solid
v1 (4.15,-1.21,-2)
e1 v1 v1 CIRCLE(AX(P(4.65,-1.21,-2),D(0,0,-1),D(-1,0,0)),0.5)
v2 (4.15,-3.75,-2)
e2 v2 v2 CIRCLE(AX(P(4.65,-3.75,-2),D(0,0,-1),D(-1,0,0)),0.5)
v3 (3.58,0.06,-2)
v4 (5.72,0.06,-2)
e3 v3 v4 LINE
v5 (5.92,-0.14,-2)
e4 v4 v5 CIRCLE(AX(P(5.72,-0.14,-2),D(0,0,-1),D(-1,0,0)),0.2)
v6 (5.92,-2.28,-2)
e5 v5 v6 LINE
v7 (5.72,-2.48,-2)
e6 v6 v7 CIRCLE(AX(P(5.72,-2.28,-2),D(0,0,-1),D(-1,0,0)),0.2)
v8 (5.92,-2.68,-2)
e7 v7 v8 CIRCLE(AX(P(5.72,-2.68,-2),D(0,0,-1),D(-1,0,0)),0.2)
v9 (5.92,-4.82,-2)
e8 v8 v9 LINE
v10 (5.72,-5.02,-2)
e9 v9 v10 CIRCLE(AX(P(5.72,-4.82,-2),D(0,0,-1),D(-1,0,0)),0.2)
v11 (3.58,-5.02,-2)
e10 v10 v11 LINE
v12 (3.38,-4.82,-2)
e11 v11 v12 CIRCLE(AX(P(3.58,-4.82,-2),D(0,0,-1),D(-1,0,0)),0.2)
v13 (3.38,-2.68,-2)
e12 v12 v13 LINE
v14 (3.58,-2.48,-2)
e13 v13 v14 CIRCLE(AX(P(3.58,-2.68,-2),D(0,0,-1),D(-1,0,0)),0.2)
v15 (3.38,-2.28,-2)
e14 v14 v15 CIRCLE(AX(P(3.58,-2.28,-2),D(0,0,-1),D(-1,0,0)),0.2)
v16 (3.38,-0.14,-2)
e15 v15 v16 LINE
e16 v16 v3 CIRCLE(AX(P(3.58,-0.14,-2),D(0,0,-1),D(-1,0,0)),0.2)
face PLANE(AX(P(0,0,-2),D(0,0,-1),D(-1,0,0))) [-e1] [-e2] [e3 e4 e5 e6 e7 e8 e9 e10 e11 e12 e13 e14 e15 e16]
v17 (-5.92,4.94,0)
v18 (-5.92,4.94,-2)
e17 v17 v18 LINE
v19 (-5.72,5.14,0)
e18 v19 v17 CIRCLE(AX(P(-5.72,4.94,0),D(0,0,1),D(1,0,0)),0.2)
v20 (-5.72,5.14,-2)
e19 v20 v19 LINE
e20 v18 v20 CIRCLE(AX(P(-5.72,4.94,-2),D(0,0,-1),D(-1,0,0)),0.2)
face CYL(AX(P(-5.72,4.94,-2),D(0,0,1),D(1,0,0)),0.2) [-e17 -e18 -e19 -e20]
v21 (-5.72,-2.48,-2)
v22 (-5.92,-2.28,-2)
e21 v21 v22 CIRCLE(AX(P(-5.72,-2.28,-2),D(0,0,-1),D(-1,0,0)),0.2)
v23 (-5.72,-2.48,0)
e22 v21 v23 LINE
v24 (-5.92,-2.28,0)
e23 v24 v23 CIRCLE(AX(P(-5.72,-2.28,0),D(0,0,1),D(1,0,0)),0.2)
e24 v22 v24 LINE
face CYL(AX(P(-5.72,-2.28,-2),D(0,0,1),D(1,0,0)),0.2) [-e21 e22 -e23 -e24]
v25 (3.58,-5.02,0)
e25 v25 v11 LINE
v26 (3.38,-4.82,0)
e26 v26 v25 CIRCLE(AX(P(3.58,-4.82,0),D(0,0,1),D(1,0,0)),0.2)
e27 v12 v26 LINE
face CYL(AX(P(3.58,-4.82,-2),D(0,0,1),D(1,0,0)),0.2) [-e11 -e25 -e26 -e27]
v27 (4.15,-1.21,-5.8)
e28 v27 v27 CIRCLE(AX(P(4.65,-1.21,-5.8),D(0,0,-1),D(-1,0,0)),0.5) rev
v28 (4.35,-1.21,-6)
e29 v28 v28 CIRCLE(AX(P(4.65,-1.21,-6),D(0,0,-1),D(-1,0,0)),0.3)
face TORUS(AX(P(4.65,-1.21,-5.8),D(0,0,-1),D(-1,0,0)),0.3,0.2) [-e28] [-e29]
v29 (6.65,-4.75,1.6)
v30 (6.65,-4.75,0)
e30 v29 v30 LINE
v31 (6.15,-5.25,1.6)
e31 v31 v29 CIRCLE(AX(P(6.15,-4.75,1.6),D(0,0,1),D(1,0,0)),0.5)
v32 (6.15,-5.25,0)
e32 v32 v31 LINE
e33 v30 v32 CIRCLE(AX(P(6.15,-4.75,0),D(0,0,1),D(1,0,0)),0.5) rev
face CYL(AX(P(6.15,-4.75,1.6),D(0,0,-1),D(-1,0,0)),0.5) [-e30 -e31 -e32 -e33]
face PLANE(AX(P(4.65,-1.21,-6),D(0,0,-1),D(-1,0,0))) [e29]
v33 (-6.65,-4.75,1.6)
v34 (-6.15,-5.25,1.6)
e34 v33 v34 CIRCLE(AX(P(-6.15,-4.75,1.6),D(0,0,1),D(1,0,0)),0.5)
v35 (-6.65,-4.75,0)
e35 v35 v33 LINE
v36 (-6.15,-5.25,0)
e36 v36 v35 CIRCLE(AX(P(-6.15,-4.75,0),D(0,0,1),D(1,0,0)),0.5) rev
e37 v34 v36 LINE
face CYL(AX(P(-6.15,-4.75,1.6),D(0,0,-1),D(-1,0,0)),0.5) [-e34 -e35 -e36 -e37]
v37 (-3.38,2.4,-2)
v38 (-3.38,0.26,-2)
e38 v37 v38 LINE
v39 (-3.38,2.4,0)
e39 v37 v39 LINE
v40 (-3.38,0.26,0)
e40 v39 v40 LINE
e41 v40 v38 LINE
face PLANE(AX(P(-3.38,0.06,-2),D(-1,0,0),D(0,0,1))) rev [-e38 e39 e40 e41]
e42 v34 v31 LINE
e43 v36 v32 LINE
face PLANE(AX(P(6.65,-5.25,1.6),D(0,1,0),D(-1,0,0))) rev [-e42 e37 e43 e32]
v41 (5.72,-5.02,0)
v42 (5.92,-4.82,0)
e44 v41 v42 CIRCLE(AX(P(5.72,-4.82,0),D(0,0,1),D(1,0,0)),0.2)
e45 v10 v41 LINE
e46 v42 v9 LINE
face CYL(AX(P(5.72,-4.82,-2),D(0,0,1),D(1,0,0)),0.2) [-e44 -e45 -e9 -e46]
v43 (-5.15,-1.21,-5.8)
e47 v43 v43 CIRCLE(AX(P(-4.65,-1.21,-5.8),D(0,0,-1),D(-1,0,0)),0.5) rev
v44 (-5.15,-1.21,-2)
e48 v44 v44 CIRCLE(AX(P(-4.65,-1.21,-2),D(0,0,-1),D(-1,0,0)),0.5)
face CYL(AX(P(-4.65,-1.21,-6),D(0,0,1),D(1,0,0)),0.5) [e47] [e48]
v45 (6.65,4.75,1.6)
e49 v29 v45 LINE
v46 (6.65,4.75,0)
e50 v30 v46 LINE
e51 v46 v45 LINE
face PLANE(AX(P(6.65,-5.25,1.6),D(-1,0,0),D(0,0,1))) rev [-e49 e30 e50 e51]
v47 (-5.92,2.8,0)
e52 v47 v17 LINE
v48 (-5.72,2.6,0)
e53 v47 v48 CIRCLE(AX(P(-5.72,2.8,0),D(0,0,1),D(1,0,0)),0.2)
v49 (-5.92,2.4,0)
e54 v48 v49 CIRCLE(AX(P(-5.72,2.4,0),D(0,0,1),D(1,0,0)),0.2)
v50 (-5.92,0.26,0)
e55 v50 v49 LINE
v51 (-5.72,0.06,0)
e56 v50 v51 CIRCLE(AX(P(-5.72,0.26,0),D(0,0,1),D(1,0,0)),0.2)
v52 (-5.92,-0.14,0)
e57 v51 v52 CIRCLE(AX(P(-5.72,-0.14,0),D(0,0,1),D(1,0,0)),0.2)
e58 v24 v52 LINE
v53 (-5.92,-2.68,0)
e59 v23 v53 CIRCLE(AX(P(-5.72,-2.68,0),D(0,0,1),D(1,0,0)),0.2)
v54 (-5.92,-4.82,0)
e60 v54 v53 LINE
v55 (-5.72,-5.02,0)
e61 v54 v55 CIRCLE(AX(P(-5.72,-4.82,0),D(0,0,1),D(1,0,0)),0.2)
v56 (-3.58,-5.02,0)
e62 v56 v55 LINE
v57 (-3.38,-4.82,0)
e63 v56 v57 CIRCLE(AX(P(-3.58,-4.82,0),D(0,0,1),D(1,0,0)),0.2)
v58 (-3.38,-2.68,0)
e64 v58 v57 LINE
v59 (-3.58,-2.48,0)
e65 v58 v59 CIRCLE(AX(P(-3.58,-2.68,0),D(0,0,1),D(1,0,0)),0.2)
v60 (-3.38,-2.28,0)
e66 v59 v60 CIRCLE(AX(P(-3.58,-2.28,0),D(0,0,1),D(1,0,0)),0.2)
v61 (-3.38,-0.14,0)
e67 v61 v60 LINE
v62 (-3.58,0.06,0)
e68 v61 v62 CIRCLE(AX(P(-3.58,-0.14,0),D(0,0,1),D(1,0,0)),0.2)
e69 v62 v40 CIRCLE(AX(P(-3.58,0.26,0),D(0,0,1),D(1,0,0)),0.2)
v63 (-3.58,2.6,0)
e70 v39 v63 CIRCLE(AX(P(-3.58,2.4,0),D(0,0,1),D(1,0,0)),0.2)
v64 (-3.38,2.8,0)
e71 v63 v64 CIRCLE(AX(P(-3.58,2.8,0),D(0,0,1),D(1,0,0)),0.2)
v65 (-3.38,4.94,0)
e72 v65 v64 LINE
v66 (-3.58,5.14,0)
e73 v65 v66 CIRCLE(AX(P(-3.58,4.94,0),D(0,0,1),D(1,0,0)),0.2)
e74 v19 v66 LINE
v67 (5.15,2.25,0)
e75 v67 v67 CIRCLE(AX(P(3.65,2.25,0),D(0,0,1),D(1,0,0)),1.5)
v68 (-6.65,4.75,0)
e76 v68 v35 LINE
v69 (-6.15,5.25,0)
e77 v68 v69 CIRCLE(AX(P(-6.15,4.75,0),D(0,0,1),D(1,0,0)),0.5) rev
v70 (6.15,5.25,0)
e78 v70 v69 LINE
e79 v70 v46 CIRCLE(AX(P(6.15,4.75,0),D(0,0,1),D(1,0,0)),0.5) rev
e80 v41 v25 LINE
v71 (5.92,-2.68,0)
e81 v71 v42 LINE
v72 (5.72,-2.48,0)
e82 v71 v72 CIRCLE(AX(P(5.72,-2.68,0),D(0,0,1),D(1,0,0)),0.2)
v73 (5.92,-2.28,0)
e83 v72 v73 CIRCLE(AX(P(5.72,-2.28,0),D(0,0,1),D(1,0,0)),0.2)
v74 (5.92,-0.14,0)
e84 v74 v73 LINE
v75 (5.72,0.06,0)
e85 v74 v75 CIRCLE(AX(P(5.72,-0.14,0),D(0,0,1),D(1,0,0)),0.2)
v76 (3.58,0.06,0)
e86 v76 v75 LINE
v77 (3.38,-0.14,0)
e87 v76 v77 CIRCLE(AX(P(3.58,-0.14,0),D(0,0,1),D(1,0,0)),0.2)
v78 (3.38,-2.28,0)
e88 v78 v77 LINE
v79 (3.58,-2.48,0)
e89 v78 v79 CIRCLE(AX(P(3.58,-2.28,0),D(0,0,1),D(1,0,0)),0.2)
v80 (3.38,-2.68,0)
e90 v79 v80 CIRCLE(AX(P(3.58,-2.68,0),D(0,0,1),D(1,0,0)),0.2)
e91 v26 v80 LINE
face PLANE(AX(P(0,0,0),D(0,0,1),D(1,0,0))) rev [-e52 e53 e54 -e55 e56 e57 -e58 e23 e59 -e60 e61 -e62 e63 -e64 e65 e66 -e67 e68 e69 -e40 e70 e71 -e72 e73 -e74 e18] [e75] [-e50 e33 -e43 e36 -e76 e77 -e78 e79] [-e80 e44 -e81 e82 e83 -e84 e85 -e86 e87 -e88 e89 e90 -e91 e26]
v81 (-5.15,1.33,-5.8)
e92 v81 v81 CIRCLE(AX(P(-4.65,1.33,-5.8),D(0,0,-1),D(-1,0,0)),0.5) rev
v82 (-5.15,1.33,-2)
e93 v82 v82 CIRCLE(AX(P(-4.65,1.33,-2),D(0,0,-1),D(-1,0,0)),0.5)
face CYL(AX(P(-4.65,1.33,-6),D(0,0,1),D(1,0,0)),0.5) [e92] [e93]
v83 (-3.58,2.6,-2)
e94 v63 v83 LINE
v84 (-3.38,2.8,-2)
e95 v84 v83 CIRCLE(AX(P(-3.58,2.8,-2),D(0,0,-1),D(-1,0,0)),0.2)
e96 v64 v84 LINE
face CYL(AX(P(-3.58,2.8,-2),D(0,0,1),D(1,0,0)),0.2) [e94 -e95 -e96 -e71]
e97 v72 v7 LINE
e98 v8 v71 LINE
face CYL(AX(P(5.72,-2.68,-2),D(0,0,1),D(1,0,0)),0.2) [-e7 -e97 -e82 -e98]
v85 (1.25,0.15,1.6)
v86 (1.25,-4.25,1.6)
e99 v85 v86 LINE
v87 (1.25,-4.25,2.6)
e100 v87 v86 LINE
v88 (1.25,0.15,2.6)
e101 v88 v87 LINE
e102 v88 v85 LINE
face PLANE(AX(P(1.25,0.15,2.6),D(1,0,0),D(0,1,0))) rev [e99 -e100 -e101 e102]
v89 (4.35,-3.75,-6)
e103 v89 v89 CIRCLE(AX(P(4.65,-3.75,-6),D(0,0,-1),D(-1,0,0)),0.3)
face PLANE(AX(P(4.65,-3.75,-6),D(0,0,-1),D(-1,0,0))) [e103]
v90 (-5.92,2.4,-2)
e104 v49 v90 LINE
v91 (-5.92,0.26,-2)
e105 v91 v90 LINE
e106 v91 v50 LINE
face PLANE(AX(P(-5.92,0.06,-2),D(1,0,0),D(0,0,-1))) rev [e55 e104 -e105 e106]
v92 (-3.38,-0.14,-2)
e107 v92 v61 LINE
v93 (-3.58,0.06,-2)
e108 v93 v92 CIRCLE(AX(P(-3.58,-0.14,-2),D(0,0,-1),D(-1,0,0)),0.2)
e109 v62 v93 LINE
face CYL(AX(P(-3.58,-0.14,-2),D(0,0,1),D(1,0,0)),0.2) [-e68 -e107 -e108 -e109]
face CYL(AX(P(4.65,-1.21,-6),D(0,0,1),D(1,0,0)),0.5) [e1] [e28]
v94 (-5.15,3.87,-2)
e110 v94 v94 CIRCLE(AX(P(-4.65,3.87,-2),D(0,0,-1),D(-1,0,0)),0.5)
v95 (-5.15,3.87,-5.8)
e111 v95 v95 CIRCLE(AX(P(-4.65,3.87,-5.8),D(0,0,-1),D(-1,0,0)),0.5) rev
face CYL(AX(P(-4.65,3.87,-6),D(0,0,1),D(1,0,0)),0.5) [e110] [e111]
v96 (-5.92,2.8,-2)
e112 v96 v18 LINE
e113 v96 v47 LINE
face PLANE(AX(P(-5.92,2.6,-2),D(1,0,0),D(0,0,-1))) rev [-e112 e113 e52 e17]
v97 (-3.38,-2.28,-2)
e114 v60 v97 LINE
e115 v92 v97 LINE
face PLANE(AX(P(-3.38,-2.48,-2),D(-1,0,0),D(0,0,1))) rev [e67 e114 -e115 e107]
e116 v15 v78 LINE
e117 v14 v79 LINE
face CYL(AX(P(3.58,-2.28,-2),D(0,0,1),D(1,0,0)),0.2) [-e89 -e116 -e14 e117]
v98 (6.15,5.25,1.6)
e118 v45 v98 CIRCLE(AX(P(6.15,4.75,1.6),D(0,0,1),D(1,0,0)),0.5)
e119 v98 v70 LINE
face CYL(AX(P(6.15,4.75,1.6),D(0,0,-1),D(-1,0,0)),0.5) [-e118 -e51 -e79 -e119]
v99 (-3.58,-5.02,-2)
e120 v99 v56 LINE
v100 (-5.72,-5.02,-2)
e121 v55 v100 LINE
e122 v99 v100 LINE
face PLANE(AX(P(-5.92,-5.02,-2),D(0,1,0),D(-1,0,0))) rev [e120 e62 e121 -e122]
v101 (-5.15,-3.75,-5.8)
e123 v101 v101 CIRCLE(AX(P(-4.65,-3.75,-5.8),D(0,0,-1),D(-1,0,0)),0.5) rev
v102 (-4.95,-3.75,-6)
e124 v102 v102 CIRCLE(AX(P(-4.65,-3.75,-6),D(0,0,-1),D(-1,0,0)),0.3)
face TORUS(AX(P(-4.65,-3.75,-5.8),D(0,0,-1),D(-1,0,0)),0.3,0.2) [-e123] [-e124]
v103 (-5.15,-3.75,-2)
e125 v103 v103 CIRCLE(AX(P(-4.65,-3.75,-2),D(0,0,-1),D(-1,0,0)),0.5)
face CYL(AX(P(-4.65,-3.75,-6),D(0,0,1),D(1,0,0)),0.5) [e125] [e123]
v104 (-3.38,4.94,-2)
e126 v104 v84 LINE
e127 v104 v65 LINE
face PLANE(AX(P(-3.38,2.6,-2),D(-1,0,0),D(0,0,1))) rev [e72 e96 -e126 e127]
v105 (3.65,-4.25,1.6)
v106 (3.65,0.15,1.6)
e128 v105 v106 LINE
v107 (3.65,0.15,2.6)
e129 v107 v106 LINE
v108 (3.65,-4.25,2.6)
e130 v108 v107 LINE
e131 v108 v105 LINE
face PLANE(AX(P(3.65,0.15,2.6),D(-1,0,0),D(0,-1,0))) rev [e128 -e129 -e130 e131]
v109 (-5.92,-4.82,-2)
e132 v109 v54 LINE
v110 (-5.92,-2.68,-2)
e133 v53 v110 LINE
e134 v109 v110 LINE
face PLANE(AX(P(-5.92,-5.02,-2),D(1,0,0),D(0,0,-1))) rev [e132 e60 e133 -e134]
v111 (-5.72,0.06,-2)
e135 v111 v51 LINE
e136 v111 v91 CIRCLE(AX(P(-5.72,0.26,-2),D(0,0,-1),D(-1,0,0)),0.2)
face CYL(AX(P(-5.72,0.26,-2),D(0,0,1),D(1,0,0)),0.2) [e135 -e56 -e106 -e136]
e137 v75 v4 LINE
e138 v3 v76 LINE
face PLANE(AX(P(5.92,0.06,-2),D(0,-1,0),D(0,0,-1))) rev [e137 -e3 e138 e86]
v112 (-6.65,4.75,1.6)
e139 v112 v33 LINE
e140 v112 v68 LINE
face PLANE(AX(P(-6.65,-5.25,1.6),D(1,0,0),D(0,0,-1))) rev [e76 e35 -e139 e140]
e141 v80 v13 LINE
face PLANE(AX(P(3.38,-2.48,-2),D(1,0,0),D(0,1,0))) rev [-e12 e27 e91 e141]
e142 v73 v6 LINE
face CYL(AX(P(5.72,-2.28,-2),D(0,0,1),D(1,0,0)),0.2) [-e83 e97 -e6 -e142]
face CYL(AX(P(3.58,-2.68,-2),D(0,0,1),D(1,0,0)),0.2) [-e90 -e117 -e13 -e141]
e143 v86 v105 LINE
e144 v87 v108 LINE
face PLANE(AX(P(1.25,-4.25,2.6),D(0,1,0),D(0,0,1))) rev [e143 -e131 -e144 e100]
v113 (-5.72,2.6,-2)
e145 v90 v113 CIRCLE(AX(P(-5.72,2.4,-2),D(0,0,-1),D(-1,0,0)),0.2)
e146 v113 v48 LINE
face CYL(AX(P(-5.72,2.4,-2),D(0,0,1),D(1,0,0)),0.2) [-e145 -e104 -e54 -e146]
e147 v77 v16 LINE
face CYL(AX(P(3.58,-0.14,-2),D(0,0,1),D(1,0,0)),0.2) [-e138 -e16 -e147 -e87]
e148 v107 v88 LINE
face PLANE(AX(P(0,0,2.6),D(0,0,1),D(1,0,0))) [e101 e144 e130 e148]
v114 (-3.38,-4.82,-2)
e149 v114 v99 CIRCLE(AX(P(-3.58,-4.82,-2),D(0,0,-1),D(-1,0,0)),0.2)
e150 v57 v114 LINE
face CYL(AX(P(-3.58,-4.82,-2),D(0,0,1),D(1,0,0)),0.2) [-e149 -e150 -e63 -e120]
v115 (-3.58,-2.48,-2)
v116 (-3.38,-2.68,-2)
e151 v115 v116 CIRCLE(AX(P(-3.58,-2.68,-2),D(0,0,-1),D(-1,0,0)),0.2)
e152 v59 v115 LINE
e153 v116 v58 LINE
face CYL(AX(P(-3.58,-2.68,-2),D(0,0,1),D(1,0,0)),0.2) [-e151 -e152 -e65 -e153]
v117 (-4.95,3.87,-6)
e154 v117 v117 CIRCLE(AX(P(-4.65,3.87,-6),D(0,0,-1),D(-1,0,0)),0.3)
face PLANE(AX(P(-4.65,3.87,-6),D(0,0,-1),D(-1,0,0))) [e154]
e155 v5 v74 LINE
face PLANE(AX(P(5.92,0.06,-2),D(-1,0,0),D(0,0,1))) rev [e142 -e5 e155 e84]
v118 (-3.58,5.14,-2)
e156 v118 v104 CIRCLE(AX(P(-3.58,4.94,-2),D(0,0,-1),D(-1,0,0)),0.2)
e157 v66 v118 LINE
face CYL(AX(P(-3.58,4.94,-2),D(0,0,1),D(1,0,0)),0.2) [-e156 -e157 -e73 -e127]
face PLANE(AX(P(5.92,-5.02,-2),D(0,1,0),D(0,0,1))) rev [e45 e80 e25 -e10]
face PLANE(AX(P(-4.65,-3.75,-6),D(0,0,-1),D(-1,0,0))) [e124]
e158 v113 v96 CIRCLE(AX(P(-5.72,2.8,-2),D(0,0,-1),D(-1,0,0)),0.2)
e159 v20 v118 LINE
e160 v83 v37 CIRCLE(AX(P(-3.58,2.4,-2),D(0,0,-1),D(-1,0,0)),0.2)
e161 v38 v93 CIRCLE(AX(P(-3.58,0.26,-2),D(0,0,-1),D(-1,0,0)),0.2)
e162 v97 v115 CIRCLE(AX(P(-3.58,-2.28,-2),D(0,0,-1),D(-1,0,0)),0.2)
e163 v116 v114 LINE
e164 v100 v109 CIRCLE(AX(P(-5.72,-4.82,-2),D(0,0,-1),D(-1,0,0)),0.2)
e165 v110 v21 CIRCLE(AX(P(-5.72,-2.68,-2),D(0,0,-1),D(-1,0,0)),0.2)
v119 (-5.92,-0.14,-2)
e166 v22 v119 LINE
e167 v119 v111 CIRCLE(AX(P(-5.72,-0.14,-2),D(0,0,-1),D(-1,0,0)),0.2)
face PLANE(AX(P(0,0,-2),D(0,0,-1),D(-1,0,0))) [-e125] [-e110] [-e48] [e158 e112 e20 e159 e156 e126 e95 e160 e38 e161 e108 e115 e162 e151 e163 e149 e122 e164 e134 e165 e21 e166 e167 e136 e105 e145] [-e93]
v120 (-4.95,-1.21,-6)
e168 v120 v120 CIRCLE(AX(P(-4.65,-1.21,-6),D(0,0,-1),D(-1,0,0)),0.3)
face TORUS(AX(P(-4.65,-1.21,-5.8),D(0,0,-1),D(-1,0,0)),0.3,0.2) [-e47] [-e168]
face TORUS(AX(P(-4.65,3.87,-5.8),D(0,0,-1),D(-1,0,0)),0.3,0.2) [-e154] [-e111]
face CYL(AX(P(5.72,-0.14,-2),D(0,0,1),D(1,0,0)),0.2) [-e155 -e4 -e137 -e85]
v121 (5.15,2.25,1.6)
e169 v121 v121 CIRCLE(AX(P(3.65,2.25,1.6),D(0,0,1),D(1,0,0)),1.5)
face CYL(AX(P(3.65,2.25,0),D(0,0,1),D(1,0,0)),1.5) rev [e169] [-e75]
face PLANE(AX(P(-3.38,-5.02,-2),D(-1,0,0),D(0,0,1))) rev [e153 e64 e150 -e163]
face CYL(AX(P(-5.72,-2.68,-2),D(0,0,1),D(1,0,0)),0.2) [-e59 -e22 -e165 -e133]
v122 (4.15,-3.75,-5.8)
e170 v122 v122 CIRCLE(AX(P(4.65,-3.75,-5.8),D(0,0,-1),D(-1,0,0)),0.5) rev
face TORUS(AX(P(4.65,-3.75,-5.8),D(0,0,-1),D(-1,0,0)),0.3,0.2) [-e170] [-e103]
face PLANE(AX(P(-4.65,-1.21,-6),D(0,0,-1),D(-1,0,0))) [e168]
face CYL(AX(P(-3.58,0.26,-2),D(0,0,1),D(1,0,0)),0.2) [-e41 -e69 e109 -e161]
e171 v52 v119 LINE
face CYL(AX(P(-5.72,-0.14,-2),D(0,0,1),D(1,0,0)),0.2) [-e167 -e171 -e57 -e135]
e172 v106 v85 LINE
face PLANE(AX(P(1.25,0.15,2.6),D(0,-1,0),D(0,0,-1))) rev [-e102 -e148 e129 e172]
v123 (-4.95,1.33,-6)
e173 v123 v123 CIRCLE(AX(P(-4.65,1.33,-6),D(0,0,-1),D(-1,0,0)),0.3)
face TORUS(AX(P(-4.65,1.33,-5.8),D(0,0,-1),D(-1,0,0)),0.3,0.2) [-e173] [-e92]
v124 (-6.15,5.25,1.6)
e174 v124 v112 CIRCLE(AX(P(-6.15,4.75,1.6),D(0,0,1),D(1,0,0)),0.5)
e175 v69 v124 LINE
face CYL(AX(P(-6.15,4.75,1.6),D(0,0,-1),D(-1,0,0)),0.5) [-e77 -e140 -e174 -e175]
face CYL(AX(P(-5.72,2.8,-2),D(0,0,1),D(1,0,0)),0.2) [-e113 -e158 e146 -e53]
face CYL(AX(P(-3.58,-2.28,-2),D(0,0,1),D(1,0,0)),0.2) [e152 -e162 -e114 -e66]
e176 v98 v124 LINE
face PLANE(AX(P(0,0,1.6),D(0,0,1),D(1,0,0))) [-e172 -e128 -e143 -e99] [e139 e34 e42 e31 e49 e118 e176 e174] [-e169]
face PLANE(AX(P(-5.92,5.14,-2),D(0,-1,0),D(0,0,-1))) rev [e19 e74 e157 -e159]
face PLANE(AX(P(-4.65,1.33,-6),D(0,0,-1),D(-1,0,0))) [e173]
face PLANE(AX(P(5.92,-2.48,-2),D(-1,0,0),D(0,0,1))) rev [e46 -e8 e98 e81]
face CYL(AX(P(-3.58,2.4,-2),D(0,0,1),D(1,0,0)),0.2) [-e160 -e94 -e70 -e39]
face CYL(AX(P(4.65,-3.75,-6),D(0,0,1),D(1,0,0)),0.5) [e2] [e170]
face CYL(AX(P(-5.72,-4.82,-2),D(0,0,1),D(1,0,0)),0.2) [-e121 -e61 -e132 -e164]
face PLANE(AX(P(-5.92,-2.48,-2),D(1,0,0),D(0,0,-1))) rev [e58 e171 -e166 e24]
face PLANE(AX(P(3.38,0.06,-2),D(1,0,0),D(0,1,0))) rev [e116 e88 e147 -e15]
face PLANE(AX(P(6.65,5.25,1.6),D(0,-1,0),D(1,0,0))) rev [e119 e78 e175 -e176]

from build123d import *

# Parameters (mm, degrees)
SKETCH1_W           = 13.3
SKETCH1_H           = 10.5
BOSS_EXTRUDE1_DEPTH = 1.6
SKETCH2_R           = 1.5
CUT_EXTRUDE1_DEPTH  = 1.6
SKETCH3_W           = 2.4
SKETCH3_H           = 4.4
BOSS_EXTRUDE2_DEPTH = 1
FILLET1_R           = 0.5
SKETCH4_W           = 2.54
SKETCH4_H           = 2.54
BOSS_EXTRUDE3_DEPTH = 2
SKETCH5_R           = 0.5
BOSS_EXTRUDE4_DEPTH = 4
FILLET2_R           = 0.2
LPATTERN1_START     = -2
LPATTERN1_DEPTH     = 2
SKETCH6_W           = 2.54
SKETCH6_H           = 2.54
BOSS_EXTRUDE5_DEPTH = 2
SKETCH7_R           = 0.5
BOSS_EXTRUDE6_DEPTH = 4
FILLET3_R           = 0.2
LPATTERN2_START     = -2
LPATTERN2_DEPTH     = 2


# Read off the part's stored shape, not the designer's step: LPattern1, LPattern2
with BuildPart() as part:
    # Sketch1 → Boss-Extrude1 (new body)
    with BuildSketch(Plane.XY):
        Rectangle(SKETCH1_W, SKETCH1_H)
    extrude(amount=BOSS_EXTRUDE1_DEPTH)

    # Sketch2 → Cut-Extrude1 (cut)
    with BuildSketch(Plane.XY.offset(1.6)):
        with Locations((3.65, 2.25)):
            Circle(SKETCH2_R)
    extrude(amount=-CUT_EXTRUDE1_DEPTH, mode=Mode.SUBTRACT)

    # Sketch3 → Boss-Extrude2 (add)
    with BuildSketch(Plane.XY.offset(1.6)):
        with Locations((2.45, -2.05)):
            Rectangle(SKETCH3_W, SKETCH3_H)
    extrude(amount=BOSS_EXTRUDE2_DEPTH)

    # Fillet1
    fillet1_edges = [part.edges().sort_by_distance(p)[0] for p in [
        (-6.65, 5.25, 0.8),
        (6.65, 5.25, 0.8),
        (6.65, -5.25, 0.8),
        (-6.65, -5.25, 0.8),
    ]]
    fillet(fillet1_edges, radius=FILLET1_R)

    # Sketch4 → Boss-Extrude3 (add)
    with BuildSketch(Plane(origin=(0, 0, 0), x_dir=(-1, 0, 0), z_dir=(0, 0, -1))):
        with Locations((4.65, -3.75)):
            Rectangle(SKETCH4_W, SKETCH4_H)
    extrude(amount=BOSS_EXTRUDE3_DEPTH)

    # Sketch5 → Boss-Extrude4 (add)
    with BuildSketch(Plane(origin=(0, 0, -2), x_dir=(-1, 0, 0), z_dir=(0, 0, -1))):
        with Locations((4.65, -3.75)):
            Circle(SKETCH5_R)
    extrude(amount=BOSS_EXTRUDE4_DEPTH)

    # Fillet2
    fillet2_edges = [part.edges().sort_by_distance(p)[0] for p in [
        (-3.38, -2.48, -1),
        (-3.38, -5.02, -1),
        (-5.92, -5.02, -1),
        (-5.92, -2.48, -1),
        (-4.15, -3.75, -6),
    ]]
    fillet(fillet2_edges, radius=FILLET2_R)

    # LPattern1 outline → LPattern1 (add)
    with BuildSketch(Plane.XY.offset(LPATTERN1_START)):
        with BuildLine():
            Line((-3.38, -2.28), (-3.38, -0.14))
            ThreePointArc((-3.38, -0.14), (-3.438578644, 0.001421356), (-3.58, 0.06))
            ThreePointArc((-3.58, 0.06), (-3.438578644, 0.118578644), (-3.38, 0.26))
            Line((-3.38, 0.26), (-3.38, 2.4))
            ThreePointArc((-3.38, 2.4), (-3.438578644, 2.541421356), (-3.58, 2.6))
            ThreePointArc((-3.58, 2.6), (-3.438578644, 2.658578644), (-3.38, 2.8))
            Line((-3.38, 2.8), (-3.38, 4.94))
            ThreePointArc((-3.38, 4.94), (-3.438578644, 5.081421356), (-3.58, 5.14))
            Line((-3.58, 5.14), (-5.72, 5.14))
            ThreePointArc((-5.72, 5.14), (-5.861421356, 5.081421356), (-5.92, 4.94))
            Line((-5.92, 4.94), (-5.92, 2.8))
            ThreePointArc((-5.92, 2.8), (-5.861421356, 2.658578644), (-5.72, 2.6))
            ThreePointArc((-5.72, 2.6), (-5.861421356, 2.541421356), (-5.92, 2.4))
            Line((-5.92, 2.4), (-5.92, 0.26))
            ThreePointArc((-5.92, 0.26), (-5.861421356, 0.118578644), (-5.72, 0.06))
            ThreePointArc((-5.72, 0.06), (-5.861421356, 0.001421356), (-5.92, -0.14))
            Line((-5.92, -0.14), (-5.92, -2.28))
            ThreePointArc((-5.92, -2.28), (-5.861421356, -2.421421356), (-5.72, -2.48))
            Line((-5.72, -2.48), (-3.58, -2.48))
            ThreePointArc((-3.58, -2.48), (-3.438578644, -2.421421356), (-3.38, -2.28))
        make_face()
    extrude(amount=LPATTERN1_DEPTH)

    # LPattern1 2 outline → LPattern1 2 (revolve)
    with BuildSketch(Plane(origin=(-4.65, -1.21, 0), x_dir=(1, 0, 0), z_dir=(0, -1, 0))):
        with BuildLine():
            Line((0, -2), (0, -6))
            Line((0, -6), (0.3, -6))
            ThreePointArc((0.3, -6), (0.441421356, -5.941421356), (0.5, -5.8))
            Line((0.5, -5.8), (0.5, -2))
            Line((0.5, -2), (0, -2))
        make_face()
    revolve(axis=Axis((-4.65, -1.21, 0), (0, 0, 1)))

    # LPattern1 3 outline → LPattern1 3 (revolve)
    with BuildSketch(Plane(origin=(-4.65, 1.33, 0), x_dir=(1, 0, 0), z_dir=(0, -1, 0))):
        with BuildLine():
            Line((0, -2), (0, -6))
            Line((0, -6), (0.3, -6))
            ThreePointArc((0.3, -6), (0.441421356, -5.941421356), (0.5, -5.8))
            Line((0.5, -5.8), (0.5, -2))
            Line((0.5, -2), (0, -2))
        make_face()
    revolve(axis=Axis((-4.65, 1.33, 0), (0, 0, 1)))

    # LPattern1 4 outline → LPattern1 4 (revolve)
    with BuildSketch(Plane(origin=(-4.65, 3.87, 0), x_dir=(1, 0, 0), z_dir=(0, -1, 0))):
        with BuildLine():
            Line((0, -2), (0, -6))
            Line((0, -6), (0.3, -6))
            ThreePointArc((0.3, -6), (0.441421356, -5.941421356), (0.5, -5.8))
            Line((0.5, -5.8), (0.5, -2))
            Line((0.5, -2), (0, -2))
        make_face()
    revolve(axis=Axis((-4.65, 3.87, 0), (0, 0, 1)))

    # Sketch6 → Boss-Extrude5 (add)
    with BuildSketch(Plane(origin=(0, 0, 0), x_dir=(-1, 0, 0), z_dir=(0, 0, -1))):
        with Locations((-4.65, -3.75)):
            Rectangle(SKETCH6_W, SKETCH6_H)
    extrude(amount=BOSS_EXTRUDE5_DEPTH)

    # Sketch7 → Boss-Extrude6 (add)
    with BuildSketch(Plane(origin=(0, 0, -2), x_dir=(-1, 0, 0), z_dir=(0, 0, -1))):
        with Locations((-4.65, -3.75)):
            Circle(SKETCH7_R)
    extrude(amount=BOSS_EXTRUDE6_DEPTH)

    # Fillet3
    fillet3_edges = [part.edges().sort_by_distance(p)[0] for p in [
        (3.38, -5.02, -1),
        (3.38, -2.48, -1),
        (5.92, -2.48, -1),
        (5.92, -5.02, -1),
        (5.15, -3.75, -6),
    ]]
    fillet(fillet3_edges, radius=FILLET3_R)

    # LPattern2 outline → LPattern2 (add)
    with BuildSketch(Plane.XY.offset(LPATTERN2_START)):
        with BuildLine():
            Line((3.38, -0.14), (3.38, -2.28))
            ThreePointArc((3.38, -2.28), (3.438578644, -2.421421356), (3.58, -2.48))
            Line((3.58, -2.48), (5.72, -2.48))
            ThreePointArc((5.72, -2.48), (5.861421356, -2.421421356), (5.92, -2.28))
            Line((5.92, -2.28), (5.92, -0.14))
            ThreePointArc((5.92, -0.14), (5.861421356, 0.001421356), (5.72, 0.06))
            Line((5.72, 0.06), (3.58, 0.06))
            ThreePointArc((3.58, 0.06), (3.438578644, 0.001421356), (3.38, -0.14))
        make_face()
    extrude(amount=LPATTERN2_DEPTH)

    # LPattern2 2 outline → LPattern2 2 (revolve)
    with BuildSketch(Plane(origin=(4.65, -1.21, 0), x_dir=(1, 0, 0), z_dir=(0, -1, 0))):
        with BuildLine():
            Line((0, -2), (0, -6))
            Line((0, -6), (0.3, -6))
            ThreePointArc((0.3, -6), (0.441421356, -5.941421356), (0.5, -5.8))
            Line((0.5, -5.8), (0.5, -2))
            Line((0.5, -2), (0, -2))
        make_face()
    revolve(axis=Axis((4.65, -1.21, 0), (0, 0, 1)))


solid = part.part
